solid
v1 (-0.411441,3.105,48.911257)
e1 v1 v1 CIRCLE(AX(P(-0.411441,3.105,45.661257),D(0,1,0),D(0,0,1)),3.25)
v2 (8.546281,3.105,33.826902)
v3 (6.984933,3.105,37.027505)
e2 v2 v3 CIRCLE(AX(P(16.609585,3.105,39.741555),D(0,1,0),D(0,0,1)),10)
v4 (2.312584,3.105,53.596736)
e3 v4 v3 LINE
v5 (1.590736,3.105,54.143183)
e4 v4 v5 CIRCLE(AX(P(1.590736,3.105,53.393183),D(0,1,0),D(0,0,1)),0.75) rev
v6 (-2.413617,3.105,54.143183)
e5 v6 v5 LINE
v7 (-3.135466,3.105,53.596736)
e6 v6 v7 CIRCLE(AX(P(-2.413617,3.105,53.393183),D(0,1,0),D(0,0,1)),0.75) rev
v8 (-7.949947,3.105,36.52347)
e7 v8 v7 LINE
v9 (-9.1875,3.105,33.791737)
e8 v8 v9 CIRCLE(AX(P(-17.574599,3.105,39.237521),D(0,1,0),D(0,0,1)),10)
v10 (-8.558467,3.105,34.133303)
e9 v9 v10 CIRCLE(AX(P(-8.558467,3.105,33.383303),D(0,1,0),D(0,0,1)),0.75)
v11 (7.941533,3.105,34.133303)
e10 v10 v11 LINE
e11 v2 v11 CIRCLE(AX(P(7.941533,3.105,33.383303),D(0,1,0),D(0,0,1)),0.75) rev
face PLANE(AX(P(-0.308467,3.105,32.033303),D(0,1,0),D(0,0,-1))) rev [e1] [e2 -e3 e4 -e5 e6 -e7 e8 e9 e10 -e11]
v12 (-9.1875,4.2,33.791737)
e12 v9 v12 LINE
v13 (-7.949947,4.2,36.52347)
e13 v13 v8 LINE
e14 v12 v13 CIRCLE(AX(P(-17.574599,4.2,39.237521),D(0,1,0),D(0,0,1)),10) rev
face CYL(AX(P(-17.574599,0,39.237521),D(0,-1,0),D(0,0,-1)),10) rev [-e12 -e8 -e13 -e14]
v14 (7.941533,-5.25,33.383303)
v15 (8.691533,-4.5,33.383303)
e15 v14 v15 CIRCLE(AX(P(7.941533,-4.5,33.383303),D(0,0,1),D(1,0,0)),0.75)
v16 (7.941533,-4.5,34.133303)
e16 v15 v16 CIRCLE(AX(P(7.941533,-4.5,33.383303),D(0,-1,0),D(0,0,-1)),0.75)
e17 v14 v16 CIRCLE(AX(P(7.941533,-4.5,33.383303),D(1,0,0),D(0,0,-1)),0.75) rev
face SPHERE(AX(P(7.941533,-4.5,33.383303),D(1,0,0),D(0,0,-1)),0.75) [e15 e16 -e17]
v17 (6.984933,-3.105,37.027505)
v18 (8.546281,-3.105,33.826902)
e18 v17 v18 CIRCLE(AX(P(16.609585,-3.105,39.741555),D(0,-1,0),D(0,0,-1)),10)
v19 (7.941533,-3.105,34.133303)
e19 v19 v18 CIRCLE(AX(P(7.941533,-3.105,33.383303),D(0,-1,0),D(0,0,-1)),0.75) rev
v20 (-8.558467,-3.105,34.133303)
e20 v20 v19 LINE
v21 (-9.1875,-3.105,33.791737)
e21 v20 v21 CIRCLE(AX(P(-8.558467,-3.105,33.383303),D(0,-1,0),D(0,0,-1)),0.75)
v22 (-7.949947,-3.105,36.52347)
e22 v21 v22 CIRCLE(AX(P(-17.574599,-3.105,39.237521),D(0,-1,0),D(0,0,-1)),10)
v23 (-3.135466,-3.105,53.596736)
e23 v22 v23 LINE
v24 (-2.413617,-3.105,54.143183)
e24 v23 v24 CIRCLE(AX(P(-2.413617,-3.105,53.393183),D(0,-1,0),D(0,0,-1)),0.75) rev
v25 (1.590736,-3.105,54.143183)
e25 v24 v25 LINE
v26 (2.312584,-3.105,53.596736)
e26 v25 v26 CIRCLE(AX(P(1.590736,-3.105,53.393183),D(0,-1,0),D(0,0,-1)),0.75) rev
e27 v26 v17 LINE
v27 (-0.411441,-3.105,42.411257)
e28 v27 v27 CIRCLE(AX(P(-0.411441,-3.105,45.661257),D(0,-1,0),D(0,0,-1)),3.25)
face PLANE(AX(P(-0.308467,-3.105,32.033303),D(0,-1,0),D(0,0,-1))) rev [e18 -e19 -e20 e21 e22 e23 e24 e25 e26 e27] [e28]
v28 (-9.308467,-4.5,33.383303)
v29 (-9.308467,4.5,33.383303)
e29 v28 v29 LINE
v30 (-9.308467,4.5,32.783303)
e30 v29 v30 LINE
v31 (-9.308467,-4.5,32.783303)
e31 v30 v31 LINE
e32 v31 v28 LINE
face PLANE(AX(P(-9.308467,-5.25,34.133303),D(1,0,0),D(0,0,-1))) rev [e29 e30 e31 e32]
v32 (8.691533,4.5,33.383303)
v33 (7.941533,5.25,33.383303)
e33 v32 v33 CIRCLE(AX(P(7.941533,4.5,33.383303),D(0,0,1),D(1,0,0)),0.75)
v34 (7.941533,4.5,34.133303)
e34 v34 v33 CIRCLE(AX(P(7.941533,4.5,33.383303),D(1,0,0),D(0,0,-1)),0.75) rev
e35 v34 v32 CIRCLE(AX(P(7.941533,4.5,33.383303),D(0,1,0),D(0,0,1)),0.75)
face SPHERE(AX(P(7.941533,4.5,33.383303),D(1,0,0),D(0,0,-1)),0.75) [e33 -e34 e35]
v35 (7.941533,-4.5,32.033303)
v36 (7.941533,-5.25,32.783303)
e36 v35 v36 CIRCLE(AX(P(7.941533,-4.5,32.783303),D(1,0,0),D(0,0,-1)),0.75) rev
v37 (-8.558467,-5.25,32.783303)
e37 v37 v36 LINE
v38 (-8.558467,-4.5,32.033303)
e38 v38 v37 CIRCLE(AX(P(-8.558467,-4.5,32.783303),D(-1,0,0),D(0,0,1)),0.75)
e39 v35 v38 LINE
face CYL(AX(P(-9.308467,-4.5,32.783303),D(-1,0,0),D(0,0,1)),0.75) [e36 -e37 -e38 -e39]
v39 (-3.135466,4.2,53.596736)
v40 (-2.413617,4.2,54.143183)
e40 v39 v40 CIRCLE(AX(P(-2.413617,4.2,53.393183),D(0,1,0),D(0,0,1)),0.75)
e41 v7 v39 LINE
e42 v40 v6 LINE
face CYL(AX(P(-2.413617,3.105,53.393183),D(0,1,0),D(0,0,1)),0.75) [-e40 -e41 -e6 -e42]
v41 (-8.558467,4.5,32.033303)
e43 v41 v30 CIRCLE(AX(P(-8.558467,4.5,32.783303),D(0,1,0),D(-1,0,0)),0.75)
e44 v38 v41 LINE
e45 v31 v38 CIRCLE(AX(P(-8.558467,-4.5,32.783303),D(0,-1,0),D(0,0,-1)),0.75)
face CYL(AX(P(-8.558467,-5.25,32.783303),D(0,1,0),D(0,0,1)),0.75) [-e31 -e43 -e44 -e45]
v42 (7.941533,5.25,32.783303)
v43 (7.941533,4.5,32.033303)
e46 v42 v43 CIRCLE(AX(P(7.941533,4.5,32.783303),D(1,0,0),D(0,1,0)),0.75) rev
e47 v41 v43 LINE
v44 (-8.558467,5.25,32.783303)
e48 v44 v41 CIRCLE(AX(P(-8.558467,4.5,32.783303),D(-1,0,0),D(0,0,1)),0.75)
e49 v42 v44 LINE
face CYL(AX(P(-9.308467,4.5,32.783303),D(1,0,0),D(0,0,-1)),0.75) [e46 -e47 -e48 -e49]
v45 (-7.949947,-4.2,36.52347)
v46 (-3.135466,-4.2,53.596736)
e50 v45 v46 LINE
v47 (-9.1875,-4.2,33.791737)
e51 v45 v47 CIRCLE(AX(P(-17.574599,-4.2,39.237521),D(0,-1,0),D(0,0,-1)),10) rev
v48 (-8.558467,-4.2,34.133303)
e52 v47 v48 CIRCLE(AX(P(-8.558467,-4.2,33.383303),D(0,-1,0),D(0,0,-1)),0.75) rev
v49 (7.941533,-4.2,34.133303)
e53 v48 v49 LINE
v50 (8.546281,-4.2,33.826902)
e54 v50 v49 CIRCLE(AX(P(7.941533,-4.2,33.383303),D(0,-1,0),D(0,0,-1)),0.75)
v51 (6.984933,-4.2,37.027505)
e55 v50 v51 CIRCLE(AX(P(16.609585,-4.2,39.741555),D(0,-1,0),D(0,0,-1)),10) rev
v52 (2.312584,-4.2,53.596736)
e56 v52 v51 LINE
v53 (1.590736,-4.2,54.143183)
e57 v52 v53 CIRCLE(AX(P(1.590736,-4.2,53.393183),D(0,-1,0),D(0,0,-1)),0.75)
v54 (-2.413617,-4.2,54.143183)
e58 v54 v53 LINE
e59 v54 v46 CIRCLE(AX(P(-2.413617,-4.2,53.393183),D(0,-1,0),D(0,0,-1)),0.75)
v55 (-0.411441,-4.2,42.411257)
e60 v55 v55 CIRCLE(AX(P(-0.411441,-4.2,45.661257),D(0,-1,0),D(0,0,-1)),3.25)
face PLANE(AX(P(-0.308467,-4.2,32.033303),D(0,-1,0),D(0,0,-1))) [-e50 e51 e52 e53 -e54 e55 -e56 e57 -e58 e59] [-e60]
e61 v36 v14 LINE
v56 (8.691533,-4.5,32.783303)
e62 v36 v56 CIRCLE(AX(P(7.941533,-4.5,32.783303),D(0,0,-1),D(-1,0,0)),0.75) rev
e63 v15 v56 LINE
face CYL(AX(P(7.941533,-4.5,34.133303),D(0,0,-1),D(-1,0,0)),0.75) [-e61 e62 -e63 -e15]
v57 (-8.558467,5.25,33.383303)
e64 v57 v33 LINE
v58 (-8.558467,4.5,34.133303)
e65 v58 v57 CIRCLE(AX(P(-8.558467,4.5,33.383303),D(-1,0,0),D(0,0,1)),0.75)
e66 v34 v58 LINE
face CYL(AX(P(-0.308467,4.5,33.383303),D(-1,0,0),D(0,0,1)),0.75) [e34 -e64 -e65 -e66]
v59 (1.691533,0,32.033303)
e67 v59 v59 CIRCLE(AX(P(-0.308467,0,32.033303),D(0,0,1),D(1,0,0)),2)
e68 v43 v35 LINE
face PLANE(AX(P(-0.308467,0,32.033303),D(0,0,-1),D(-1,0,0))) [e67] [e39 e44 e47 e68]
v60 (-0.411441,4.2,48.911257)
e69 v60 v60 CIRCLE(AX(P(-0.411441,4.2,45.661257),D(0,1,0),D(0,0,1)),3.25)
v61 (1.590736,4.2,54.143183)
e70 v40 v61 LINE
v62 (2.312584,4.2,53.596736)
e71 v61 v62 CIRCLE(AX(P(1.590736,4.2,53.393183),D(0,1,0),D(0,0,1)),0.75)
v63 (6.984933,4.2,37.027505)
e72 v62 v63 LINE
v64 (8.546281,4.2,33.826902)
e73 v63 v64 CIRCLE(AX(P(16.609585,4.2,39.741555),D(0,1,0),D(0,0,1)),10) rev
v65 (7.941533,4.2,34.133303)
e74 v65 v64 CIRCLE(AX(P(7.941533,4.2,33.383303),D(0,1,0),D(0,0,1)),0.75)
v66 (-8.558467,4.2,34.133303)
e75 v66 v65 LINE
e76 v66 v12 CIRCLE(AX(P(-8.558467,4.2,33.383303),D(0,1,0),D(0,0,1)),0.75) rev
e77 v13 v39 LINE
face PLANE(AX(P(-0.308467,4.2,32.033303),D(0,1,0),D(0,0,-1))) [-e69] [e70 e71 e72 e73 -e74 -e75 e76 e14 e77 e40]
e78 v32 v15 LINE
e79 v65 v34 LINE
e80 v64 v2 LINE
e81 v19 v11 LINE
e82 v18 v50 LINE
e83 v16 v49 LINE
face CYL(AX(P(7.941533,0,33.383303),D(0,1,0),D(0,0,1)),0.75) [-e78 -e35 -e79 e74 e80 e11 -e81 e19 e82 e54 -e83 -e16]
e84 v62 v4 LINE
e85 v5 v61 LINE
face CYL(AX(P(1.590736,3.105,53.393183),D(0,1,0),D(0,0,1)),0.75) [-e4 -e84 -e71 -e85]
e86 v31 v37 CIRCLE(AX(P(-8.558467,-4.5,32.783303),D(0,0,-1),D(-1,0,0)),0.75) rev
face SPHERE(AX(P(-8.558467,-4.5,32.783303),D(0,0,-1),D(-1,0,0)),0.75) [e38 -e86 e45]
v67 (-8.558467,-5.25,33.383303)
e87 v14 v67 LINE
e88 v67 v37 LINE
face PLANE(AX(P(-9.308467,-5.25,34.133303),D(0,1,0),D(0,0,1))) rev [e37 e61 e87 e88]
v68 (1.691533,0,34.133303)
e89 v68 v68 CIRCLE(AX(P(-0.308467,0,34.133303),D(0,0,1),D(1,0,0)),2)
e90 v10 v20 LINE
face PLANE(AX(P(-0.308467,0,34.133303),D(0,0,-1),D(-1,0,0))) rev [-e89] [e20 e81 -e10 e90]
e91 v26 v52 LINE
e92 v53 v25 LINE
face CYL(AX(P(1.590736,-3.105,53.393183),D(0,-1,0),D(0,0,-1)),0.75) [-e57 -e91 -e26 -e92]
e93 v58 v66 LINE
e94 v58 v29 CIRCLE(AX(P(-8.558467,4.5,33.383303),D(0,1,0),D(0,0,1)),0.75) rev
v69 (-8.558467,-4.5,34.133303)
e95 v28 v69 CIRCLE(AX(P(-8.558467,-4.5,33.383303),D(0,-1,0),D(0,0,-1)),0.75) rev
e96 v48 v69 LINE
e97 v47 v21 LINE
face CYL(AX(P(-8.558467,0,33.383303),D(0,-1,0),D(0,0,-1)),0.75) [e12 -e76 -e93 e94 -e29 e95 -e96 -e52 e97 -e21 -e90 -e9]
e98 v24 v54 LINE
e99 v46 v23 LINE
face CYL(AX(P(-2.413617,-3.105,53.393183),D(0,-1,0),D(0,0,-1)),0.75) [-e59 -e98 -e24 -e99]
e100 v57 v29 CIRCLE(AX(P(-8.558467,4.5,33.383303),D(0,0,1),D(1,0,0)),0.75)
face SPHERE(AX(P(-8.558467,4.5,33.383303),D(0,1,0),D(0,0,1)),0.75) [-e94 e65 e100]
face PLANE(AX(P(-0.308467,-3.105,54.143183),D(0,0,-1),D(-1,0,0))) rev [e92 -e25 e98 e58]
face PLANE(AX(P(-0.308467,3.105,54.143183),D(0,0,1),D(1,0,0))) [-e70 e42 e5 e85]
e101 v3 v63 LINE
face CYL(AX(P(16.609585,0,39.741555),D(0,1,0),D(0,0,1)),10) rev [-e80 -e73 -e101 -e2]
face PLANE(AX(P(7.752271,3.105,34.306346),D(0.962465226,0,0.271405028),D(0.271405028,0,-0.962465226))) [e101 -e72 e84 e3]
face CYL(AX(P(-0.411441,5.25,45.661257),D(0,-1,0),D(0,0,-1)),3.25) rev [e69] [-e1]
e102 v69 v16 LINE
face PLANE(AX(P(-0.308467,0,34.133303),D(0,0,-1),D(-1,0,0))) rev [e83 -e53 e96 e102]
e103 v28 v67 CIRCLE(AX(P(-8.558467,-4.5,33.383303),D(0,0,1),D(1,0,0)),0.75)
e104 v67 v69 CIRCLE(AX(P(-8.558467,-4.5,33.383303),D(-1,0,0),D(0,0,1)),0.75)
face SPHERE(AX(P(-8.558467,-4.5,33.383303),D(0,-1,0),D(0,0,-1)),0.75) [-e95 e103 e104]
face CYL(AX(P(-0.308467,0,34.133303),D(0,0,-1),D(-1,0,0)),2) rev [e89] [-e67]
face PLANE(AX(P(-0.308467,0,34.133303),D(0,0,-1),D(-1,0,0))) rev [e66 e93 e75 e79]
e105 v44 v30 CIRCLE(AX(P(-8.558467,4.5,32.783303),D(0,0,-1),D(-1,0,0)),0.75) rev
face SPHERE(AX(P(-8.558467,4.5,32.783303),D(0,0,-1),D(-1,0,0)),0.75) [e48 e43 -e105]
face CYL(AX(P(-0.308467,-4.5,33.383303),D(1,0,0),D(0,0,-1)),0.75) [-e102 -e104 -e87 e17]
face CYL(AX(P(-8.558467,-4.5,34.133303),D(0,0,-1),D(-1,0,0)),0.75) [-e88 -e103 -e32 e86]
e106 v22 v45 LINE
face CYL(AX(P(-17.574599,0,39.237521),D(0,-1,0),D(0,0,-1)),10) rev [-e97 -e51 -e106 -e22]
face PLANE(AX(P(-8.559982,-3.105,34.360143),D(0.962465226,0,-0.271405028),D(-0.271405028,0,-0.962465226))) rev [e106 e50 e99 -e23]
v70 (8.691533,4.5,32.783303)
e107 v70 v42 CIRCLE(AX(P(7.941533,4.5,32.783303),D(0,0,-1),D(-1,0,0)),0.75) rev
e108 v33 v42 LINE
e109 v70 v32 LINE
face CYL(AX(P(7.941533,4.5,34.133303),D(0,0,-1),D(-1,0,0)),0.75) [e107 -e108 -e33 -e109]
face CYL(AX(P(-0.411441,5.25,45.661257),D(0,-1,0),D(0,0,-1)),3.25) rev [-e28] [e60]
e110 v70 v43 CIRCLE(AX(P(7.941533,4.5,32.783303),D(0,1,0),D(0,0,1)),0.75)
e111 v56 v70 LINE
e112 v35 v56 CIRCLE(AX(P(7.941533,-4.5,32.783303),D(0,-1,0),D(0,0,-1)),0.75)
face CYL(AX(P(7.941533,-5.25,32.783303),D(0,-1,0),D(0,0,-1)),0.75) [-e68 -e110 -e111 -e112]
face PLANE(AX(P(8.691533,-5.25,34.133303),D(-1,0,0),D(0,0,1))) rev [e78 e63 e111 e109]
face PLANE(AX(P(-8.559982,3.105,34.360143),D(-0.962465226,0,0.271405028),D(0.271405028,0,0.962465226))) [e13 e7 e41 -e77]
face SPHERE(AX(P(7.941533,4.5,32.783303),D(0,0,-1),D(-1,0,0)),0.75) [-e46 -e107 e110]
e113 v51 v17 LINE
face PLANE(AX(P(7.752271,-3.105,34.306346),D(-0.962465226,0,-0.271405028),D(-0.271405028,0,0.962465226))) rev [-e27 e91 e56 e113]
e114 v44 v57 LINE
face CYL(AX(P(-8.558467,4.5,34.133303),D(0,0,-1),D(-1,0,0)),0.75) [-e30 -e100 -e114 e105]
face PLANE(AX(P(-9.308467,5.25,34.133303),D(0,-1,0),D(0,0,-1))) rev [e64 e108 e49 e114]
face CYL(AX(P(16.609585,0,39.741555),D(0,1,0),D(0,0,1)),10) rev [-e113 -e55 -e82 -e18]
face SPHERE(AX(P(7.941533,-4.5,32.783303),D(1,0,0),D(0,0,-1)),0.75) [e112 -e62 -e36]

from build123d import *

# Parameters (mm, degrees)
SKETCH1_W           = 120
SKETCH1_H           = 70
SKETCH1_R           = 13.333333333
BOSS_EXTRUDE1_DEPTH = 14
BOSS_EXTRUDE2_DEPTH = 7.3
SKETCH4_R           = 21.666666667
CUT_EXTRUDE1_DEPTH  = 172.159351628
FILLET1_R           = 5
FILLET2_R           = 5
SCALE1_SCALE        = 0.15
FILLET3_START       = -4.2
FILLET3_DEPTH       = 1.095
FILLET3_START_2     = 3.105
FILLET3_2_DEPTH     = 1.095


with BuildPart() as part:
    # Sketch1 → Boss-Extrude1 (new body)
    with BuildSketch(Plane.XY):
        Rectangle(SKETCH1_W, SKETCH1_H)
        Circle(SKETCH1_R, mode=Mode.SUBTRACT)
    extrude(amount=BOSS_EXTRUDE1_DEPTH)

    # Sketch3 → Boss-Extrude2 (add)
    with BuildSketch(Plane(origin=(0, -28, 0), x_dir=(-1, 0, 0), z_dir=(0, -1, 0))):
        Polygon((55.436544165, -14), (-54.063561803, -14), (-16.446396869, -147.399198267), (17.819379231, -147.399198267), align=None)
    boss_extrude2 = extrude(amount=-BOSS_EXTRUDE2_DEPTH)

    # Mirror1: Boss-Extrude2 across plane
    add(boss_extrude2.mirror(Plane.ZX))

    # Sketch4 → Cut-Extrude1 (cut, through all)
    with BuildSketch(Plane.XZ.offset(28)):
        with Locations(Location((-0.686491181, 90.853024988, 0), (0, 0, 90))):
            Circle(SKETCH4_R)
    extrude(amount=-CUT_EXTRUDE1_DEPTH, mode=Mode.SUBTRACT)

    # Fillet1
    # the kernel refuses this fillet: 5 mm, written as the material it takes off along each edge
    with BuildSketch(Plane(origin=(-55, 30, 9), x_dir=(0, 0, 1), z_dir=(-1, 0, 0))) as fillet1_piece_1_section:
        Polygon((0, 0), (FILLET1_R * 1.02, 0), (FILLET1_R * 1.02, FILLET1_R * 1.02), (0, FILLET1_R * 1.02), align=None)
    fillet1_piece_1 = extrude(amount=FILLET1_R * 1.02, mode=Mode.PRIVATE)
    fillet1_piece_1 = fillet1_piece_1 - Plane(origin=(-55, 30, 9), x_dir=(0, -0.7071067811865475, -0.7071067811865475), z_dir=(-1, 0, 0)) * Sphere(FILLET1_R, mode=Mode.PRIVATE)
    add(fillet1_piece_1, mode=Mode.SUBTRACT)
    with BuildSketch(Plane(origin=(-55, -30, 9), x_dir=(-1, 0, 0), z_dir=(0, -1, 0))) as fillet1_piece_2_section:
        Polygon((0, 0), (FILLET1_R * 1.02, 0), (FILLET1_R * 1.02, -FILLET1_R * 1.02), (0, -FILLET1_R * 1.02), align=None)
    fillet1_piece_2 = extrude(amount=FILLET1_R * 1.02, mode=Mode.PRIVATE)
    fillet1_piece_2 = fillet1_piece_2 - Plane(origin=(-55, -30, 9), x_dir=(0.7071067811865475, 0, -0.7071067811865475), z_dir=(0, -1, 0)) * Sphere(FILLET1_R, mode=Mode.PRIVATE)
    add(fillet1_piece_2, mode=Mode.SUBTRACT)
    with BuildSketch(Plane(origin=(-55, 30, 5), x_dir=(0, 0, -1), z_dir=(-1, 0, 0))) as fillet1_piece_3_section:
        Polygon((0, 0), (FILLET1_R * 1.02, 0), (FILLET1_R * 1.02, -FILLET1_R * 1.02), (0, -FILLET1_R * 1.02), align=None)
    fillet1_piece_3 = extrude(amount=FILLET1_R * 1.02, mode=Mode.PRIVATE)
    fillet1_piece_3 = fillet1_piece_3 - Plane(origin=(-55, 30, 5), x_dir=(0, -0.7071067811865475, 0.7071067811865475), z_dir=(-1, 0, 0)) * Sphere(FILLET1_R, mode=Mode.PRIVATE)
    add(fillet1_piece_3, mode=Mode.SUBTRACT)
    with BuildSketch(Plane(origin=(-55, -30, 5), x_dir=(-1, 0, 0), z_dir=(0, -1, 0))) as fillet1_piece_4_section:
        Polygon((0, 0), (FILLET1_R * 1.02, 0), (FILLET1_R * 1.02, FILLET1_R * 1.02), (0, FILLET1_R * 1.02), align=None)
    fillet1_piece_4 = extrude(amount=FILLET1_R * 1.02, mode=Mode.PRIVATE)
    fillet1_piece_4 = fillet1_piece_4 - Plane(origin=(-55, -30, 5), x_dir=(0.7071067811865475, 0, 0.7071067811865475), z_dir=(0, -1, 0)) * Sphere(FILLET1_R, mode=Mode.PRIVATE)
    add(fillet1_piece_4, mode=Mode.SUBTRACT)
    with BuildSketch(Plane(origin=(55, 30, 9), x_dir=(0, 0, 1), z_dir=(1, 0, 0))) as fillet1_piece_5_section:
        Polygon((0, 0), (FILLET1_R * 1.02, 0), (FILLET1_R * 1.02, -FILLET1_R * 1.02), (0, -FILLET1_R * 1.02), align=None)
    fillet1_piece_5 = extrude(amount=FILLET1_R * 1.02, mode=Mode.PRIVATE)
    fillet1_piece_5 = fillet1_piece_5 - Plane(origin=(55, 30, 9), x_dir=(0, -0.7071067811865475, -0.7071067811865475), z_dir=(1, 0, 0)) * Sphere(FILLET1_R, mode=Mode.PRIVATE)
    add(fillet1_piece_5, mode=Mode.SUBTRACT)
    with BuildSketch(Plane(origin=(55, 30, 5), x_dir=(0, 0, -1), z_dir=(1, 0, 0))) as fillet1_piece_6_section:
        Polygon((0, 0), (FILLET1_R * 1.02, 0), (FILLET1_R * 1.02, FILLET1_R * 1.02), (0, FILLET1_R * 1.02), align=None)
    fillet1_piece_6 = extrude(amount=FILLET1_R * 1.02, mode=Mode.PRIVATE)
    fillet1_piece_6 = fillet1_piece_6 - Plane(origin=(55, 30, 5), x_dir=(0, -0.7071067811865475, 0.7071067811865475), z_dir=(1, 0, 0)) * Sphere(FILLET1_R, mode=Mode.PRIVATE)
    add(fillet1_piece_6, mode=Mode.SUBTRACT)
    with BuildSketch(Plane(origin=(55, -30, 9), x_dir=(1, 0, 0), z_dir=(0, -1, 0))) as fillet1_piece_7_section:
        Polygon((0, 0), (FILLET1_R * 1.02, 0), (FILLET1_R * 1.02, FILLET1_R * 1.02), (0, FILLET1_R * 1.02), align=None)
    fillet1_piece_7 = extrude(amount=FILLET1_R * 1.02, mode=Mode.PRIVATE)
    fillet1_piece_7 = fillet1_piece_7 - Plane(origin=(55, -30, 9), x_dir=(-0.7071067811865475, 0, -0.7071067811865475), z_dir=(0, -1, 0)) * Sphere(FILLET1_R, mode=Mode.PRIVATE)
    add(fillet1_piece_7, mode=Mode.SUBTRACT)
    with BuildSketch(Plane(origin=(55, -30, 5), x_dir=(1, 0, 0), z_dir=(0, -1, 0))) as fillet1_piece_8_section:
        Polygon((0, 0), (FILLET1_R * 1.02, 0), (FILLET1_R * 1.02, -FILLET1_R * 1.02), (0, -FILLET1_R * 1.02), align=None)
    fillet1_piece_8 = extrude(amount=FILLET1_R * 1.02, mode=Mode.PRIVATE)
    fillet1_piece_8 = fillet1_piece_8 - Plane(origin=(55, -30, 5), x_dir=(-0.7071067811865475, 0, 0.7071067811865475), z_dir=(0, -1, 0)) * Sphere(FILLET1_R, mode=Mode.PRIVATE)
    add(fillet1_piece_8, mode=Mode.SUBTRACT)
    with BuildSketch(Plane(origin=(-60, 30, 14), x_dir=(0, 0, -1), z_dir=(0, -1, 0))) as fillet1_piece_9_section:
        with BuildLine():
            CenterArc((FILLET1_R, FILLET1_R), FILLET1_R, 180, 90)
            Line((0, FILLET1_R), (0, 0))
            Line((0, 0), (FILLET1_R, 0))
        make_face()
    fillet1_piece_9 = extrude(amount=60, mode=Mode.PRIVATE)
    fillet1_piece_9 = split(fillet1_piece_9, bisect_by=Plane(origin=(-55.772691467, 30, 12.807943643), z_dir=(-0.9624652257513497, 0, 0.2714050279921198)), keep=Keep.TOP, mode=Mode.PRIVATE)
    add(fillet1_piece_9, mode=Mode.SUBTRACT)
    with BuildSketch(Plane(origin=(-60, 30, 14), x_dir=(0, 0, -1), z_dir=(0, -1, 0))) as fillet1_piece_10_section:
        with BuildLine():
            CenterArc((FILLET1_R, FILLET1_R), FILLET1_R, 180, 90)
            Line((0, FILLET1_R), (0, 0))
            Line((0, 0), (FILLET1_R, 0))
        make_face()
    fillet1_piece_10 = extrude(amount=60, mode=Mode.PRIVATE)
    fillet1_piece_10 = split(fillet1_piece_10, bisect_by=Plane(origin=(-60, 28, 14), z_dir=(0, 1, 0)), keep=Keep.TOP, mode=Mode.PRIVATE)
    add(fillet1_piece_10, mode=Mode.SUBTRACT)
    with BuildSketch(Plane(origin=(-60, 30, 14), x_dir=(0, 0, -1), z_dir=(0, -1, 0))) as fillet1_piece_11_section:
        with BuildLine():
            CenterArc((FILLET1_R, FILLET1_R), FILLET1_R, 180, 90)
            Line((0, FILLET1_R), (0, 0))
            Line((0, 0), (FILLET1_R, 0))
        make_face()
    fillet1_piece_11 = extrude(amount=60, mode=Mode.PRIVATE)
    fillet1_piece_11 = split(fillet1_piece_11, bisect_by=Plane(origin=(-60, -20.7, 14), z_dir=(0, 1, 0)), keep=Keep.TOP, mode=Mode.PRIVATE)
    fillet1_piece_11 = split(fillet1_piece_11, bisect_by=Plane(origin=(-60, 20.7, 14), z_dir=(0, -1, 0)), keep=Keep.TOP, mode=Mode.PRIVATE)
    add(fillet1_piece_11, mode=Mode.SUBTRACT)
    with BuildSketch(Plane(origin=(-60, 30, 14), x_dir=(0, 0, -1), z_dir=(0, -1, 0))) as fillet1_piece_12_section:
        with BuildLine():
            CenterArc((FILLET1_R, FILLET1_R), FILLET1_R, 180, 90)
            Line((0, FILLET1_R), (0, 0))
            Line((0, 0), (FILLET1_R, 0))
        make_face()
    fillet1_piece_12 = extrude(amount=60, mode=Mode.PRIVATE)
    fillet1_piece_12 = split(fillet1_piece_12, bisect_by=Plane(origin=(-60, -28, 14), z_dir=(0, -1, 0)), keep=Keep.TOP, mode=Mode.PRIVATE)
    add(fillet1_piece_12, mode=Mode.SUBTRACT)
    with BuildSketch(Plane(origin=(-60, 30, 0), x_dir=(0, 0, 1), z_dir=(0, -1, 0)), Plane(origin=(60, -30, 0), x_dir=(0, 0, 1), z_dir=(0, 1, 0))) as fillet1_piece_13:
        with BuildLine():
            CenterArc((FILLET1_R, -FILLET1_R), FILLET1_R, 90, 90)
            Line((0, -FILLET1_R), (0, 0))
            Line((0, 0), (FILLET1_R, 0))
        make_face()
    extrude(amount=60, mode=Mode.SUBTRACT)
    with BuildSketch(Plane(origin=(55, 35, 14), x_dir=(0, -1, 0), z_dir=(-1, 0, 0)), Plane(origin=(-55, -35, 0), x_dir=(0, 0, 1), z_dir=(1, 0, 0))) as fillet1_piece_14:
        with BuildLine():
            CenterArc((FILLET1_R, -FILLET1_R), FILLET1_R, 90, 90)
            Line((0, -FILLET1_R), (0, 0))
            Line((0, 0), (FILLET1_R, 0))
        make_face()
    extrude(amount=110, mode=Mode.SUBTRACT)
    with BuildSketch(Plane(origin=(-60, 35, 5), x_dir=(0, -1, 0), z_dir=(0, 0, 1)), Plane(origin=(-60, -35, 5), x_dir=(1, 0, 0), z_dir=(0, 0, 1))) as fillet1_piece_15:
        with BuildLine():
            CenterArc((FILLET1_R, FILLET1_R), FILLET1_R, 180, 90)
            Line((0, FILLET1_R), (0, 0))
            Line((0, 0), (FILLET1_R, 0))
        make_face()
    extrude(amount=4, mode=Mode.SUBTRACT)
    with BuildSketch(Plane(origin=(55, 35, 0), x_dir=(0, -1, 0), z_dir=(-1, 0, 0)), Plane(origin=(-55, -35, 14), x_dir=(0, 0, -1), z_dir=(1, 0, 0))) as fillet1_piece_16:
        with BuildLine():
            CenterArc((FILLET1_R, FILLET1_R), FILLET1_R, 180, 90)
            Line((0, FILLET1_R), (0, 0))
            Line((0, 0), (FILLET1_R, 0))
        make_face()
    extrude(amount=110, mode=Mode.SUBTRACT)
    with BuildSketch(Plane(origin=(60, -30, 14), x_dir=(0, 0, -1), z_dir=(0, 1, 0))) as fillet1_piece_17:
        with BuildLine():
            CenterArc((FILLET1_R, FILLET1_R), FILLET1_R, 180, 90)
            Line((0, FILLET1_R), (0, 0))
            Line((0, 0), (FILLET1_R, 0))
        make_face()
    extrude(amount=60, mode=Mode.SUBTRACT)
    with BuildSketch(Plane(origin=(60, 35, 5), x_dir=(0, -1, 0), z_dir=(0, 0, 1)), Plane(origin=(60, -35, 5), x_dir=(-1, 0, 0), z_dir=(0, 0, 1))) as fillet1_piece_18:
        with BuildLine():
            CenterArc((FILLET1_R, -FILLET1_R), FILLET1_R, 90, 90)
            Line((0, -FILLET1_R), (0, 0))
            Line((0, 0), (FILLET1_R, 0))
        make_face()
    extrude(amount=4, mode=Mode.SUBTRACT)

    # Fillet2
    fillet2_edges = [part.edges().sort_by_distance(p)[0] for p in [
        (-17.819379231, -24.35, 147.399198267),
        (16.446396869, -24.35, 147.399198267),
        (16.446396869, 24.35, 147.399198267),
        (-17.819379231, 24.35, 147.399198267),
    ]]
    fillet(fillet2_edges, radius=FILLET2_R)


with BuildPart() as part_1:
    # Scale1: scaled about (-0.362902499, 0, 37.686238577)
    add(part.part.scale(SCALE1_SCALE).moved(Location((-0.308467124, 0, 32.03330279))))

    # Fillet3: read off the stored shape, not the designer's step
    # Fillet3 outline → Fillet3 (add)
    with BuildSketch(Plane(origin=(0, 0, 0), x_dir=(1, 0, 0), z_dir=(0, 1, 0)).offset(FILLET3_START)):
        with BuildLine():
            ThreePointArc((-8.624776975, -34.130365708), (-8.945174574, -34.025920365), (-9.187499582, -33.791736588))
            ThreePointArc((-9.187499582, -33.791736588), (-8.465735644, -35.11094716), (-7.949946764, -36.523470273))
            Line((-7.949946764, -36.523470273), (-8.624776975, -34.130365708))
        make_face()
        with BuildLine():
            Line((7.941532876, -34.13330279), (7.801067146, -34.13330279))
            Line((7.801067146, -34.13330279), (6.984932745, -37.027504812))
            ThreePointArc((6.984932745, -37.027504812), (7.621987061, -35.357141421), (8.546280698, -33.826901788))
            ThreePointArc((8.546280698, -33.826901788), (8.280502455, -34.052331656), (7.941532876, -34.13330279))
        make_face()
    extrude(amount=FILLET3_DEPTH)

    # Fillet3 2 outline → Fillet3 2 (add)
    with BuildSketch(Plane(origin=(0, 0, 0), x_dir=(1, 0, 0), z_dir=(0, 1, 0)).offset(FILLET3_START_2)):
        with BuildLine():
            ThreePointArc((-8.624776975, -34.130365708), (-8.945174574, -34.025920365), (-9.187499582, -33.791736588))
            ThreePointArc((-9.187499582, -33.791736588), (-8.465735644, -35.11094716), (-7.949946764, -36.523470273))
            Line((-7.949946764, -36.523470273), (-8.624776975, -34.130365708))
        make_face()
        with BuildLine():
            Line((7.941532876, -34.13330279), (7.801067146, -34.13330279))
            Line((7.801067146, -34.13330279), (6.984932745, -37.027504812))
            ThreePointArc((6.984932745, -37.027504812), (7.621987061, -35.357141421), (8.546280698, -33.826901788))
            ThreePointArc((8.546280698, -33.826901788), (8.280502455, -34.052331656), (7.941532876, -34.13330279))
        make_face()
    extrude(amount=FILLET3_2_DEPTH)


solid = part_1.part
